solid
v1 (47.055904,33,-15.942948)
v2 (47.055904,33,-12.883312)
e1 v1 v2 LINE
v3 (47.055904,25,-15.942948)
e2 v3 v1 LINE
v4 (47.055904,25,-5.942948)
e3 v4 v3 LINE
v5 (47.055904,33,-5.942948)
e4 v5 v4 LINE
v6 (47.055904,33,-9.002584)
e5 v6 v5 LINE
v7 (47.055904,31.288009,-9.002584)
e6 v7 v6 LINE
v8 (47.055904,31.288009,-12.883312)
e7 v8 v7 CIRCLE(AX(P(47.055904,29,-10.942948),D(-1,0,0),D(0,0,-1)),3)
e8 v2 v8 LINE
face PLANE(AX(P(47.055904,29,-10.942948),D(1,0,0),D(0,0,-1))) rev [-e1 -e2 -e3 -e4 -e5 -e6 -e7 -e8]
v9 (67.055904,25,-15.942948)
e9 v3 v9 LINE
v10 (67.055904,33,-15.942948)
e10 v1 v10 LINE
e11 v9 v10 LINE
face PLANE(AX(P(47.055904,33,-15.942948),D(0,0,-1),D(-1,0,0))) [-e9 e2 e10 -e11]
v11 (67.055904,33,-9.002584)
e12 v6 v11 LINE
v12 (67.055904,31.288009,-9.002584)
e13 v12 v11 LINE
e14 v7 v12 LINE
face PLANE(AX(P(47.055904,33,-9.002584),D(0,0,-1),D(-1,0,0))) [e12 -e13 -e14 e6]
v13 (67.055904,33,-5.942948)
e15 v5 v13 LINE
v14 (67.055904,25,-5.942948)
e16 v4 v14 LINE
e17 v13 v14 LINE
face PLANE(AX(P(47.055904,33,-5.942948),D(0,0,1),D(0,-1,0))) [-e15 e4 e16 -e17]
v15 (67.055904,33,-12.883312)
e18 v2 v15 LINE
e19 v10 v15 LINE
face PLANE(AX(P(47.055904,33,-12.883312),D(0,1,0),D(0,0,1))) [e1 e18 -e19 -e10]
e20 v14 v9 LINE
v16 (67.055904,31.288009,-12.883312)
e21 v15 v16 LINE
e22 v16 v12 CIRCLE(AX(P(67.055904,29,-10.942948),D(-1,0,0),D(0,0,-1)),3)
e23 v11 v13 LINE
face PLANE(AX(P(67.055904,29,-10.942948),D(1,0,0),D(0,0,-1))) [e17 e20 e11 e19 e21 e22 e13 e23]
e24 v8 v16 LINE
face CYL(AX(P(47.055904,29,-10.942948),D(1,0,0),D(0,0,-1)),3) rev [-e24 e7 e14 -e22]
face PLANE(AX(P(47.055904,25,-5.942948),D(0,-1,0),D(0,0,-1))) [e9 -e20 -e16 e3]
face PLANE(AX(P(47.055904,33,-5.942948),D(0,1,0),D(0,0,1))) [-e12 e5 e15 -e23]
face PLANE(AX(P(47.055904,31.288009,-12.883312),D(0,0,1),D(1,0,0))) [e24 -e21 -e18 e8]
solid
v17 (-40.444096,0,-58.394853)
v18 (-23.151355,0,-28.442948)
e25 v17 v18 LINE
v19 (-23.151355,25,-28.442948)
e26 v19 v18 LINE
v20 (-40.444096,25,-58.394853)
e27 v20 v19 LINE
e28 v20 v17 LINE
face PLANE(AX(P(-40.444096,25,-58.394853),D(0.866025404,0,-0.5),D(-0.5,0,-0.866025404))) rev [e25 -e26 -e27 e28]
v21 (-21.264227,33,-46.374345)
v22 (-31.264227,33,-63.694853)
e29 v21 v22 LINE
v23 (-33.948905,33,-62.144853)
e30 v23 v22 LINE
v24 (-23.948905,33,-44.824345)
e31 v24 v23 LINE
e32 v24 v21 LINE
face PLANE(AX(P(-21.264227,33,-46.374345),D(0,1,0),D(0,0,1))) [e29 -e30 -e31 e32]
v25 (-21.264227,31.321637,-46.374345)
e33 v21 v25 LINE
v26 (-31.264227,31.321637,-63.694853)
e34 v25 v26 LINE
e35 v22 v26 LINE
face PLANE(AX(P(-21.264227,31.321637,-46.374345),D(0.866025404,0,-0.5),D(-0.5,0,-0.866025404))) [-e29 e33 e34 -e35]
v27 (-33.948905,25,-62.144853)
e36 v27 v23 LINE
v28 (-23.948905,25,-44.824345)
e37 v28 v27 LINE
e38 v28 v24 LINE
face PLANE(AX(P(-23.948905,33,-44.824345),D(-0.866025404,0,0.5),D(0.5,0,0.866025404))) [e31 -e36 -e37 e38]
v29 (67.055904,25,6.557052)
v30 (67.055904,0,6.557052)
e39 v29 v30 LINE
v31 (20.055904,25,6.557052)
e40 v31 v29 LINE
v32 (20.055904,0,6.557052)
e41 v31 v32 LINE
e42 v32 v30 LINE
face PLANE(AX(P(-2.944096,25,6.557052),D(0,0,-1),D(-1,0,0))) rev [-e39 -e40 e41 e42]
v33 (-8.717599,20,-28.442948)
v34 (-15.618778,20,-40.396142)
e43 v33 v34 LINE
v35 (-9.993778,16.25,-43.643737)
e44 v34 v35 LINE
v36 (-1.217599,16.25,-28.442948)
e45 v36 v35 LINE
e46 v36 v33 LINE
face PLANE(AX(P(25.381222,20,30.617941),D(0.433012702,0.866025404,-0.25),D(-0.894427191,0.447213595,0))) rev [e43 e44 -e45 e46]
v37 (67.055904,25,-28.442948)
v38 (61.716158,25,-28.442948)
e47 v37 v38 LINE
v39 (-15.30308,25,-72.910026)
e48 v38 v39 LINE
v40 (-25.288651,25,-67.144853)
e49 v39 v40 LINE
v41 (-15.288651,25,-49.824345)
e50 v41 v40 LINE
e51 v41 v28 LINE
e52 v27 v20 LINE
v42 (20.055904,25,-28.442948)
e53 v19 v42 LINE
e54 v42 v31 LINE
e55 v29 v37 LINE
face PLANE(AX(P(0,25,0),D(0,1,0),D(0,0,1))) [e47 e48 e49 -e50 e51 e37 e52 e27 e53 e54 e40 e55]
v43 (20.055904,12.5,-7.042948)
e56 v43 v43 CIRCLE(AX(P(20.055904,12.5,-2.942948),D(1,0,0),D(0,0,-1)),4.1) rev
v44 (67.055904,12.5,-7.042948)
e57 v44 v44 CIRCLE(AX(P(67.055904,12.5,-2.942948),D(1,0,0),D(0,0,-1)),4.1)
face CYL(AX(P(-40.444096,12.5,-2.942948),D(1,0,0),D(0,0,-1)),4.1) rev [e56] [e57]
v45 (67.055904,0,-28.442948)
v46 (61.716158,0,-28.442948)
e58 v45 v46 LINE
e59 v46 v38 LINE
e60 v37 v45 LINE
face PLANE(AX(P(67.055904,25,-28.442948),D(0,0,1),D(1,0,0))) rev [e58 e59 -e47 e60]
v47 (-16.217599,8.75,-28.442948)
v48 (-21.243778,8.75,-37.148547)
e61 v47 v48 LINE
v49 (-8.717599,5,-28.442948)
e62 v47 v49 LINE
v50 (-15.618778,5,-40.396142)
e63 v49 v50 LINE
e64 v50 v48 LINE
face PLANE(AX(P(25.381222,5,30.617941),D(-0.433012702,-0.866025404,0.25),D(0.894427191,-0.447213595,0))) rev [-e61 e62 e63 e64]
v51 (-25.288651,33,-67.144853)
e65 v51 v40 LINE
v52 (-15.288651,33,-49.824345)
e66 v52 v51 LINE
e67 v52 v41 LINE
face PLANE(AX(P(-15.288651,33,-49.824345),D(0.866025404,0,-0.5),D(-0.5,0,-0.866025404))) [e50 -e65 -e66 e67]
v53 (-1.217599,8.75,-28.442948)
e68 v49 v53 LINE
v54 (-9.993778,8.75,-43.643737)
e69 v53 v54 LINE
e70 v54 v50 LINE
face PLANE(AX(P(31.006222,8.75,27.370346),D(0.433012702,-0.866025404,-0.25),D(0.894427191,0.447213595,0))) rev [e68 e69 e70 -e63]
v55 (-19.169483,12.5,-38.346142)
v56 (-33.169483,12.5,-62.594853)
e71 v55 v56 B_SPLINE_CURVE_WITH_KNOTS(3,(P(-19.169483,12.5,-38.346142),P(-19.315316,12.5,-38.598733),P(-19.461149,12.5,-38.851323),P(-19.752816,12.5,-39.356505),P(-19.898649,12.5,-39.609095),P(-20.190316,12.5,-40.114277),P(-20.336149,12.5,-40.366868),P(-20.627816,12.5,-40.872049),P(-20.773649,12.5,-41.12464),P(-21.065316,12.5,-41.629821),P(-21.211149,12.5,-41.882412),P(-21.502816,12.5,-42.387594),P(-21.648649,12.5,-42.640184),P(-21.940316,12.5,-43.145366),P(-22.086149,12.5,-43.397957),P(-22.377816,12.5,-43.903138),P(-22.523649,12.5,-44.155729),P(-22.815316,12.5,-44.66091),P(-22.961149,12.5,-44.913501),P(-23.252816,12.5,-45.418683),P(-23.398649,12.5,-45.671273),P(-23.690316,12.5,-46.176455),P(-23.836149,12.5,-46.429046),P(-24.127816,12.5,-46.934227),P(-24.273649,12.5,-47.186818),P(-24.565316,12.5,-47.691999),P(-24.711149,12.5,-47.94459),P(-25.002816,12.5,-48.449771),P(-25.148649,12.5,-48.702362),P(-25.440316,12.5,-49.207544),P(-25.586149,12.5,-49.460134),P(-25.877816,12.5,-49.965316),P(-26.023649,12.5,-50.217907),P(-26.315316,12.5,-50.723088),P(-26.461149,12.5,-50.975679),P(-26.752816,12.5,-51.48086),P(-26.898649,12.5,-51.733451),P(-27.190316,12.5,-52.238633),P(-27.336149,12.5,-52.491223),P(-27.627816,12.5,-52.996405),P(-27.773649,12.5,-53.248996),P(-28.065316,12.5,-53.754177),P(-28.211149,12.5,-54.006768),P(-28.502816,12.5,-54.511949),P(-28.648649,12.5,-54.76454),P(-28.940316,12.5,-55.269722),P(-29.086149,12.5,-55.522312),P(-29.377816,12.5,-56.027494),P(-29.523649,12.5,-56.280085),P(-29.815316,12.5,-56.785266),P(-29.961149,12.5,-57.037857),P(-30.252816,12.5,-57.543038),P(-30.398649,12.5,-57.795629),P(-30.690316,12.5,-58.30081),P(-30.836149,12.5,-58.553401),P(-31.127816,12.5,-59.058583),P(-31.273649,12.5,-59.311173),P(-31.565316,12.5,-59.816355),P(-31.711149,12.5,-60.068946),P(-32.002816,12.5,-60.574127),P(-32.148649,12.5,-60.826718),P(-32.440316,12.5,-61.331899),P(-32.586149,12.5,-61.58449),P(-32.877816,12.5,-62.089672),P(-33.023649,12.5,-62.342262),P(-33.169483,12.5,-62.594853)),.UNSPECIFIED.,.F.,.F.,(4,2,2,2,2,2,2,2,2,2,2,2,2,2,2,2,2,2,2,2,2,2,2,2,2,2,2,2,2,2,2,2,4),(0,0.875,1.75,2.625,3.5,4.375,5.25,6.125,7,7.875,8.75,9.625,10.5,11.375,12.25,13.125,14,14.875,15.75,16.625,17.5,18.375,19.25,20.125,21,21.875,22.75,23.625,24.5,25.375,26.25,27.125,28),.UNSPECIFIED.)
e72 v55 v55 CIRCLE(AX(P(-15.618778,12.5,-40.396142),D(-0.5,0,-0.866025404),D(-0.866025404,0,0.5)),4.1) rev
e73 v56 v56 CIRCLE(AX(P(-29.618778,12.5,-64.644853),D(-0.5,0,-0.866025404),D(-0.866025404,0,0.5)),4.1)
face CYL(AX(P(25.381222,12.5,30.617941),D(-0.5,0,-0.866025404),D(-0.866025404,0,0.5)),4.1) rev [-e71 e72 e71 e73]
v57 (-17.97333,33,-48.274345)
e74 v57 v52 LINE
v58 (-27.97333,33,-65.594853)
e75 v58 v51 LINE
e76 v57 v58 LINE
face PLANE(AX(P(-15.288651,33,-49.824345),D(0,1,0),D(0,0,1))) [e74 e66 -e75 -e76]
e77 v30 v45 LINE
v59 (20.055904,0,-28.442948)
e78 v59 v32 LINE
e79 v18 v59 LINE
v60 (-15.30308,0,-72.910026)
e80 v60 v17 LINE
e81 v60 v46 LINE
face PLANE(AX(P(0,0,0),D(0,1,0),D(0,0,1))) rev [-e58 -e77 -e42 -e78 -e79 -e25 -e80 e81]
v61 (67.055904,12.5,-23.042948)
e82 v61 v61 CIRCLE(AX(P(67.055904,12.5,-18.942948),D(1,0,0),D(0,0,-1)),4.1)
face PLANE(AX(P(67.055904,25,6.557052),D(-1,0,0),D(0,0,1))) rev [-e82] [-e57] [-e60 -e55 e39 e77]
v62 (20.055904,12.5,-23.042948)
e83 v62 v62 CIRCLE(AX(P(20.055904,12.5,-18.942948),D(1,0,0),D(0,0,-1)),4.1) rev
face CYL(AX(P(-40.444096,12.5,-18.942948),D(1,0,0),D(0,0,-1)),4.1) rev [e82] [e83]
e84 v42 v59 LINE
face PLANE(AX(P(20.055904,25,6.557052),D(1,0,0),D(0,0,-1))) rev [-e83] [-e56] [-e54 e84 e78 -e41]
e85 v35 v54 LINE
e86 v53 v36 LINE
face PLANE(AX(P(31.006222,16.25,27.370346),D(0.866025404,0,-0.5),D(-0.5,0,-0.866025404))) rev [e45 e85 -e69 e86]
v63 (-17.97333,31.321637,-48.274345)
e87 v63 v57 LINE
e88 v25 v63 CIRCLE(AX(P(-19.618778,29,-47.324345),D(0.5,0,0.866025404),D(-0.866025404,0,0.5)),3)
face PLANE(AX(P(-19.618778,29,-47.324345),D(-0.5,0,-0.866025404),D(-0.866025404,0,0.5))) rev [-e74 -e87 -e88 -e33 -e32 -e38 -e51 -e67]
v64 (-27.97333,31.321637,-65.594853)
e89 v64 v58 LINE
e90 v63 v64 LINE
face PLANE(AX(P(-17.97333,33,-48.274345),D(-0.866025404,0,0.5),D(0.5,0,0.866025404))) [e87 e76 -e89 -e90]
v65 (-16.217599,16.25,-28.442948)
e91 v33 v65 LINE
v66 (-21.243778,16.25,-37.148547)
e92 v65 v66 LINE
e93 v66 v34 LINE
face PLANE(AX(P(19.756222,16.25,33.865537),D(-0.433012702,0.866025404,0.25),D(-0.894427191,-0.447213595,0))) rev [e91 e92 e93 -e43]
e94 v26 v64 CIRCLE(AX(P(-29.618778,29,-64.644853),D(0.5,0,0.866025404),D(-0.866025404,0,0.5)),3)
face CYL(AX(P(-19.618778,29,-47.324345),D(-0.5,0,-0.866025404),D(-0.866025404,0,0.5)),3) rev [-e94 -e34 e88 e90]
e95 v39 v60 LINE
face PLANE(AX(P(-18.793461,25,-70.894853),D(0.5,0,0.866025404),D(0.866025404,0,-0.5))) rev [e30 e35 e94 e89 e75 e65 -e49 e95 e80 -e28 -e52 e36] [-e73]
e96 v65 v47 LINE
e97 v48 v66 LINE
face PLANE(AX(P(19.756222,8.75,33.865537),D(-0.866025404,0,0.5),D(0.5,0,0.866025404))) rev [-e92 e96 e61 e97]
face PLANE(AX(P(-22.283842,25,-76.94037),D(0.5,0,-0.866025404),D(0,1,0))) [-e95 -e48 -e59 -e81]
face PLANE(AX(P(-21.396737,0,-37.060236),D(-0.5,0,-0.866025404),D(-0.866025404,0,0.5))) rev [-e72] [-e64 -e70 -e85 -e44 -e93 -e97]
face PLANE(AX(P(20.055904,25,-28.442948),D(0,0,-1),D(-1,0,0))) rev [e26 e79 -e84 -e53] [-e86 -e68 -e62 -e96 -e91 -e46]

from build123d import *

# Parameters (mm, degrees)
BOSS_EXTRUDE1_DEPTH = 25
SKETCH2_R           = 4.1
CUT_EXTRUDE1_DEPTH  = 132.176713612
SKETCH3_R           = 4.1
CUT_EXTRUDE2_DEPTH  = 126.40868204
CUT_EXTRUDE4_START  = -28
CUT_EXTRUDE4_DEPTH  = 98.40868204
CHAMFER1_SIZE       = 56
CUT_EXTRUDE5_DEPTH  = 103.163428306
BOSS_EXTRUDE2_DEPTH = 20
BOSS_EXTRUDE3_DEPTH = 20


with BuildPart() as part:
    # Sketch1 → Boss-Extrude1 (new body)
    with BuildSketch(Plane(origin=(0, 0, 0), x_dir=(1, 0, 0), z_dir=(0, 1, 0))):
        Polygon((-40.444096004, 58.394853086), (-2.944096004, -6.557052198), (67.055903996, -6.557052198), (67.055903996, 28.442947802), (5.716158034, 28.442947802), (-18.793460909, 70.894853086), align=None)
    extrude(amount=BOSS_EXTRUDE1_DEPTH)

    # Sketch2 → Cut-Extrude1 (cut, through all)
    with BuildSketch(Plane(origin=(67.055903996, 0, 0), x_dir=(0, 0, -1), z_dir=(1, 0, 0))):
        with Locations((2.942947802, 12.5)):
            Circle(SKETCH2_R)
        with Locations((18.942947802, 12.5)):
            Circle(SKETCH2_R)
    extrude(amount=-CUT_EXTRUDE1_DEPTH, mode=Mode.SUBTRACT)

    # Sketch3 → Cut-Extrude2 (cut, through all)
    with BuildSketch(Plane(origin=(-35.396737112, 0, -61.3089471), x_dir=(-0.8660254037844396, 0, 0.4999999999999984), z_dir=(-0.49999999999999833, 0, -0.8660254037844395))):
        with Locations((-6.671811971, 12.5)):
            Circle(SKETCH3_R)
    extrude(amount=-CUT_EXTRUDE2_DEPTH, mode=Mode.SUBTRACT)

    # Sketch5 → Cut-Extrude4 (cut, through all)
    with BuildSketch(Plane(origin=(-35.396737112, 0, -61.3089471), x_dir=(-0.8660254037844397, 0, 0.4999999999999983), z_dir=(-0.4999999999999982, 0, -0.8660254037844396)).offset(CUT_EXTRUDE4_START)):
        Polygon((-13.167002499, 16.25), (-13.167002499, 8.75), (-6.671811971, 5), (-0.176621442, 8.75), (-0.176621442, 16.25), (-6.671811971, 20), align=None)
    extrude(amount=-CUT_EXTRUDE4_DEPTH, mode=Mode.SUBTRACT)

    # Chamfer1
    # the kernel refuses this chamfer: 56 mm, written as the material it adds along each edge
    with BuildSketch(Plane(origin=(5.716158034, 0, -28.442947802), x_dir=(-0.5166440803046883, 0, -0.8562002652920185), z_dir=(0, 1, 0))) as chamfer1_piece_1_section:
        Polygon((CHAMFER1_SIZE * 0.999813220622, -CHAMFER1_SIZE * 0.0193267656127), (-CHAMFER1_SIZE * 0.516644080305, -CHAMFER1_SIZE * 0.856200265292), (0, 0), align=None)
    chamfer1_piece_1 = extrude(amount=25, mode=Mode.PRIVATE)
    chamfer1_piece_1 = split(chamfer1_piece_1, bisect_by=Plane(origin=(-4.727526646, 12.5, -79.015824019), z_dir=(0.49999999999999756, 0, 0.86602540378444)), keep=Keep.TOP, mode=Mode.PRIVATE)
    add(chamfer1_piece_1)

    # Sketch6 → Cut-Extrude5 (cut, through all)
    with BuildSketch(Plane.XZ):
        Polygon((20.055903996, 6.557052198), (20.055903996, -28.442947802), (-23.151355425, -28.442947802), (-2.944096004, 6.557052198), align=None)
    extrude(amount=-CUT_EXTRUDE5_DEPTH, mode=Mode.SUBTRACT)

    # Sketch7 → Boss-Extrude2 (add)
    with BuildSketch(Plane(origin=(-35.396737112, 0, -61.3089471), x_dir=(-0.86602540378444, 0, 0.49999999999999784), z_dir=(-0.49999999999999784, 0, -0.86602540378444))):
        with BuildLine():
            Line((-1.671811971, 33), (-1.671811971, 25))
            Line((-1.671811971, 25), (-11.671811971, 25))
            Line((-11.671811971, 25), (-11.671811971, 33))
            Line((-11.671811971, 33), (-8.571811971, 33))
            Line((-8.571811971, 33), (-8.571811971, 31.321637353))
            ThreePointArc((-8.571811971, 31.321637353), (-6.671811971, 26), (-4.771811971, 31.321637353))
            Line((-4.771811971, 31.321637353), (-4.771811971, 33))
            Line((-4.771811971, 33), (-1.671811971, 33))
        make_face()
    extrude(amount=-BOSS_EXTRUDE2_DEPTH)


with BuildPart() as body_2:
    # Sketch8 → Boss-Extrude3 (new body)
    with BuildSketch(Plane(origin=(67.055903996, 0, 0), x_dir=(0, 0, -1), z_dir=(1, 0, 0))):
        with BuildLine():
            Line((5.942947802, 33), (9.002583557, 33))
            Line((9.002583557, 33), (9.002583557, 31.288009309))
            ThreePointArc((9.002583557, 31.288009309), (10.942947802, 26), (12.883312047, 31.288009309))
            Line((12.883312047, 31.288009309), (12.883312047, 33))
            Line((12.883312047, 33), (15.942947802, 33))
            Line((15.942947802, 33), (15.942947802, 25))
            Line((15.942947802, 25), (5.942947802, 25))
            Line((5.942947802, 25), (5.942947802, 33))
        make_face()
    extrude(amount=-BOSS_EXTRUDE3_DEPTH)


solid = Compound([part.part, body_2.part])
